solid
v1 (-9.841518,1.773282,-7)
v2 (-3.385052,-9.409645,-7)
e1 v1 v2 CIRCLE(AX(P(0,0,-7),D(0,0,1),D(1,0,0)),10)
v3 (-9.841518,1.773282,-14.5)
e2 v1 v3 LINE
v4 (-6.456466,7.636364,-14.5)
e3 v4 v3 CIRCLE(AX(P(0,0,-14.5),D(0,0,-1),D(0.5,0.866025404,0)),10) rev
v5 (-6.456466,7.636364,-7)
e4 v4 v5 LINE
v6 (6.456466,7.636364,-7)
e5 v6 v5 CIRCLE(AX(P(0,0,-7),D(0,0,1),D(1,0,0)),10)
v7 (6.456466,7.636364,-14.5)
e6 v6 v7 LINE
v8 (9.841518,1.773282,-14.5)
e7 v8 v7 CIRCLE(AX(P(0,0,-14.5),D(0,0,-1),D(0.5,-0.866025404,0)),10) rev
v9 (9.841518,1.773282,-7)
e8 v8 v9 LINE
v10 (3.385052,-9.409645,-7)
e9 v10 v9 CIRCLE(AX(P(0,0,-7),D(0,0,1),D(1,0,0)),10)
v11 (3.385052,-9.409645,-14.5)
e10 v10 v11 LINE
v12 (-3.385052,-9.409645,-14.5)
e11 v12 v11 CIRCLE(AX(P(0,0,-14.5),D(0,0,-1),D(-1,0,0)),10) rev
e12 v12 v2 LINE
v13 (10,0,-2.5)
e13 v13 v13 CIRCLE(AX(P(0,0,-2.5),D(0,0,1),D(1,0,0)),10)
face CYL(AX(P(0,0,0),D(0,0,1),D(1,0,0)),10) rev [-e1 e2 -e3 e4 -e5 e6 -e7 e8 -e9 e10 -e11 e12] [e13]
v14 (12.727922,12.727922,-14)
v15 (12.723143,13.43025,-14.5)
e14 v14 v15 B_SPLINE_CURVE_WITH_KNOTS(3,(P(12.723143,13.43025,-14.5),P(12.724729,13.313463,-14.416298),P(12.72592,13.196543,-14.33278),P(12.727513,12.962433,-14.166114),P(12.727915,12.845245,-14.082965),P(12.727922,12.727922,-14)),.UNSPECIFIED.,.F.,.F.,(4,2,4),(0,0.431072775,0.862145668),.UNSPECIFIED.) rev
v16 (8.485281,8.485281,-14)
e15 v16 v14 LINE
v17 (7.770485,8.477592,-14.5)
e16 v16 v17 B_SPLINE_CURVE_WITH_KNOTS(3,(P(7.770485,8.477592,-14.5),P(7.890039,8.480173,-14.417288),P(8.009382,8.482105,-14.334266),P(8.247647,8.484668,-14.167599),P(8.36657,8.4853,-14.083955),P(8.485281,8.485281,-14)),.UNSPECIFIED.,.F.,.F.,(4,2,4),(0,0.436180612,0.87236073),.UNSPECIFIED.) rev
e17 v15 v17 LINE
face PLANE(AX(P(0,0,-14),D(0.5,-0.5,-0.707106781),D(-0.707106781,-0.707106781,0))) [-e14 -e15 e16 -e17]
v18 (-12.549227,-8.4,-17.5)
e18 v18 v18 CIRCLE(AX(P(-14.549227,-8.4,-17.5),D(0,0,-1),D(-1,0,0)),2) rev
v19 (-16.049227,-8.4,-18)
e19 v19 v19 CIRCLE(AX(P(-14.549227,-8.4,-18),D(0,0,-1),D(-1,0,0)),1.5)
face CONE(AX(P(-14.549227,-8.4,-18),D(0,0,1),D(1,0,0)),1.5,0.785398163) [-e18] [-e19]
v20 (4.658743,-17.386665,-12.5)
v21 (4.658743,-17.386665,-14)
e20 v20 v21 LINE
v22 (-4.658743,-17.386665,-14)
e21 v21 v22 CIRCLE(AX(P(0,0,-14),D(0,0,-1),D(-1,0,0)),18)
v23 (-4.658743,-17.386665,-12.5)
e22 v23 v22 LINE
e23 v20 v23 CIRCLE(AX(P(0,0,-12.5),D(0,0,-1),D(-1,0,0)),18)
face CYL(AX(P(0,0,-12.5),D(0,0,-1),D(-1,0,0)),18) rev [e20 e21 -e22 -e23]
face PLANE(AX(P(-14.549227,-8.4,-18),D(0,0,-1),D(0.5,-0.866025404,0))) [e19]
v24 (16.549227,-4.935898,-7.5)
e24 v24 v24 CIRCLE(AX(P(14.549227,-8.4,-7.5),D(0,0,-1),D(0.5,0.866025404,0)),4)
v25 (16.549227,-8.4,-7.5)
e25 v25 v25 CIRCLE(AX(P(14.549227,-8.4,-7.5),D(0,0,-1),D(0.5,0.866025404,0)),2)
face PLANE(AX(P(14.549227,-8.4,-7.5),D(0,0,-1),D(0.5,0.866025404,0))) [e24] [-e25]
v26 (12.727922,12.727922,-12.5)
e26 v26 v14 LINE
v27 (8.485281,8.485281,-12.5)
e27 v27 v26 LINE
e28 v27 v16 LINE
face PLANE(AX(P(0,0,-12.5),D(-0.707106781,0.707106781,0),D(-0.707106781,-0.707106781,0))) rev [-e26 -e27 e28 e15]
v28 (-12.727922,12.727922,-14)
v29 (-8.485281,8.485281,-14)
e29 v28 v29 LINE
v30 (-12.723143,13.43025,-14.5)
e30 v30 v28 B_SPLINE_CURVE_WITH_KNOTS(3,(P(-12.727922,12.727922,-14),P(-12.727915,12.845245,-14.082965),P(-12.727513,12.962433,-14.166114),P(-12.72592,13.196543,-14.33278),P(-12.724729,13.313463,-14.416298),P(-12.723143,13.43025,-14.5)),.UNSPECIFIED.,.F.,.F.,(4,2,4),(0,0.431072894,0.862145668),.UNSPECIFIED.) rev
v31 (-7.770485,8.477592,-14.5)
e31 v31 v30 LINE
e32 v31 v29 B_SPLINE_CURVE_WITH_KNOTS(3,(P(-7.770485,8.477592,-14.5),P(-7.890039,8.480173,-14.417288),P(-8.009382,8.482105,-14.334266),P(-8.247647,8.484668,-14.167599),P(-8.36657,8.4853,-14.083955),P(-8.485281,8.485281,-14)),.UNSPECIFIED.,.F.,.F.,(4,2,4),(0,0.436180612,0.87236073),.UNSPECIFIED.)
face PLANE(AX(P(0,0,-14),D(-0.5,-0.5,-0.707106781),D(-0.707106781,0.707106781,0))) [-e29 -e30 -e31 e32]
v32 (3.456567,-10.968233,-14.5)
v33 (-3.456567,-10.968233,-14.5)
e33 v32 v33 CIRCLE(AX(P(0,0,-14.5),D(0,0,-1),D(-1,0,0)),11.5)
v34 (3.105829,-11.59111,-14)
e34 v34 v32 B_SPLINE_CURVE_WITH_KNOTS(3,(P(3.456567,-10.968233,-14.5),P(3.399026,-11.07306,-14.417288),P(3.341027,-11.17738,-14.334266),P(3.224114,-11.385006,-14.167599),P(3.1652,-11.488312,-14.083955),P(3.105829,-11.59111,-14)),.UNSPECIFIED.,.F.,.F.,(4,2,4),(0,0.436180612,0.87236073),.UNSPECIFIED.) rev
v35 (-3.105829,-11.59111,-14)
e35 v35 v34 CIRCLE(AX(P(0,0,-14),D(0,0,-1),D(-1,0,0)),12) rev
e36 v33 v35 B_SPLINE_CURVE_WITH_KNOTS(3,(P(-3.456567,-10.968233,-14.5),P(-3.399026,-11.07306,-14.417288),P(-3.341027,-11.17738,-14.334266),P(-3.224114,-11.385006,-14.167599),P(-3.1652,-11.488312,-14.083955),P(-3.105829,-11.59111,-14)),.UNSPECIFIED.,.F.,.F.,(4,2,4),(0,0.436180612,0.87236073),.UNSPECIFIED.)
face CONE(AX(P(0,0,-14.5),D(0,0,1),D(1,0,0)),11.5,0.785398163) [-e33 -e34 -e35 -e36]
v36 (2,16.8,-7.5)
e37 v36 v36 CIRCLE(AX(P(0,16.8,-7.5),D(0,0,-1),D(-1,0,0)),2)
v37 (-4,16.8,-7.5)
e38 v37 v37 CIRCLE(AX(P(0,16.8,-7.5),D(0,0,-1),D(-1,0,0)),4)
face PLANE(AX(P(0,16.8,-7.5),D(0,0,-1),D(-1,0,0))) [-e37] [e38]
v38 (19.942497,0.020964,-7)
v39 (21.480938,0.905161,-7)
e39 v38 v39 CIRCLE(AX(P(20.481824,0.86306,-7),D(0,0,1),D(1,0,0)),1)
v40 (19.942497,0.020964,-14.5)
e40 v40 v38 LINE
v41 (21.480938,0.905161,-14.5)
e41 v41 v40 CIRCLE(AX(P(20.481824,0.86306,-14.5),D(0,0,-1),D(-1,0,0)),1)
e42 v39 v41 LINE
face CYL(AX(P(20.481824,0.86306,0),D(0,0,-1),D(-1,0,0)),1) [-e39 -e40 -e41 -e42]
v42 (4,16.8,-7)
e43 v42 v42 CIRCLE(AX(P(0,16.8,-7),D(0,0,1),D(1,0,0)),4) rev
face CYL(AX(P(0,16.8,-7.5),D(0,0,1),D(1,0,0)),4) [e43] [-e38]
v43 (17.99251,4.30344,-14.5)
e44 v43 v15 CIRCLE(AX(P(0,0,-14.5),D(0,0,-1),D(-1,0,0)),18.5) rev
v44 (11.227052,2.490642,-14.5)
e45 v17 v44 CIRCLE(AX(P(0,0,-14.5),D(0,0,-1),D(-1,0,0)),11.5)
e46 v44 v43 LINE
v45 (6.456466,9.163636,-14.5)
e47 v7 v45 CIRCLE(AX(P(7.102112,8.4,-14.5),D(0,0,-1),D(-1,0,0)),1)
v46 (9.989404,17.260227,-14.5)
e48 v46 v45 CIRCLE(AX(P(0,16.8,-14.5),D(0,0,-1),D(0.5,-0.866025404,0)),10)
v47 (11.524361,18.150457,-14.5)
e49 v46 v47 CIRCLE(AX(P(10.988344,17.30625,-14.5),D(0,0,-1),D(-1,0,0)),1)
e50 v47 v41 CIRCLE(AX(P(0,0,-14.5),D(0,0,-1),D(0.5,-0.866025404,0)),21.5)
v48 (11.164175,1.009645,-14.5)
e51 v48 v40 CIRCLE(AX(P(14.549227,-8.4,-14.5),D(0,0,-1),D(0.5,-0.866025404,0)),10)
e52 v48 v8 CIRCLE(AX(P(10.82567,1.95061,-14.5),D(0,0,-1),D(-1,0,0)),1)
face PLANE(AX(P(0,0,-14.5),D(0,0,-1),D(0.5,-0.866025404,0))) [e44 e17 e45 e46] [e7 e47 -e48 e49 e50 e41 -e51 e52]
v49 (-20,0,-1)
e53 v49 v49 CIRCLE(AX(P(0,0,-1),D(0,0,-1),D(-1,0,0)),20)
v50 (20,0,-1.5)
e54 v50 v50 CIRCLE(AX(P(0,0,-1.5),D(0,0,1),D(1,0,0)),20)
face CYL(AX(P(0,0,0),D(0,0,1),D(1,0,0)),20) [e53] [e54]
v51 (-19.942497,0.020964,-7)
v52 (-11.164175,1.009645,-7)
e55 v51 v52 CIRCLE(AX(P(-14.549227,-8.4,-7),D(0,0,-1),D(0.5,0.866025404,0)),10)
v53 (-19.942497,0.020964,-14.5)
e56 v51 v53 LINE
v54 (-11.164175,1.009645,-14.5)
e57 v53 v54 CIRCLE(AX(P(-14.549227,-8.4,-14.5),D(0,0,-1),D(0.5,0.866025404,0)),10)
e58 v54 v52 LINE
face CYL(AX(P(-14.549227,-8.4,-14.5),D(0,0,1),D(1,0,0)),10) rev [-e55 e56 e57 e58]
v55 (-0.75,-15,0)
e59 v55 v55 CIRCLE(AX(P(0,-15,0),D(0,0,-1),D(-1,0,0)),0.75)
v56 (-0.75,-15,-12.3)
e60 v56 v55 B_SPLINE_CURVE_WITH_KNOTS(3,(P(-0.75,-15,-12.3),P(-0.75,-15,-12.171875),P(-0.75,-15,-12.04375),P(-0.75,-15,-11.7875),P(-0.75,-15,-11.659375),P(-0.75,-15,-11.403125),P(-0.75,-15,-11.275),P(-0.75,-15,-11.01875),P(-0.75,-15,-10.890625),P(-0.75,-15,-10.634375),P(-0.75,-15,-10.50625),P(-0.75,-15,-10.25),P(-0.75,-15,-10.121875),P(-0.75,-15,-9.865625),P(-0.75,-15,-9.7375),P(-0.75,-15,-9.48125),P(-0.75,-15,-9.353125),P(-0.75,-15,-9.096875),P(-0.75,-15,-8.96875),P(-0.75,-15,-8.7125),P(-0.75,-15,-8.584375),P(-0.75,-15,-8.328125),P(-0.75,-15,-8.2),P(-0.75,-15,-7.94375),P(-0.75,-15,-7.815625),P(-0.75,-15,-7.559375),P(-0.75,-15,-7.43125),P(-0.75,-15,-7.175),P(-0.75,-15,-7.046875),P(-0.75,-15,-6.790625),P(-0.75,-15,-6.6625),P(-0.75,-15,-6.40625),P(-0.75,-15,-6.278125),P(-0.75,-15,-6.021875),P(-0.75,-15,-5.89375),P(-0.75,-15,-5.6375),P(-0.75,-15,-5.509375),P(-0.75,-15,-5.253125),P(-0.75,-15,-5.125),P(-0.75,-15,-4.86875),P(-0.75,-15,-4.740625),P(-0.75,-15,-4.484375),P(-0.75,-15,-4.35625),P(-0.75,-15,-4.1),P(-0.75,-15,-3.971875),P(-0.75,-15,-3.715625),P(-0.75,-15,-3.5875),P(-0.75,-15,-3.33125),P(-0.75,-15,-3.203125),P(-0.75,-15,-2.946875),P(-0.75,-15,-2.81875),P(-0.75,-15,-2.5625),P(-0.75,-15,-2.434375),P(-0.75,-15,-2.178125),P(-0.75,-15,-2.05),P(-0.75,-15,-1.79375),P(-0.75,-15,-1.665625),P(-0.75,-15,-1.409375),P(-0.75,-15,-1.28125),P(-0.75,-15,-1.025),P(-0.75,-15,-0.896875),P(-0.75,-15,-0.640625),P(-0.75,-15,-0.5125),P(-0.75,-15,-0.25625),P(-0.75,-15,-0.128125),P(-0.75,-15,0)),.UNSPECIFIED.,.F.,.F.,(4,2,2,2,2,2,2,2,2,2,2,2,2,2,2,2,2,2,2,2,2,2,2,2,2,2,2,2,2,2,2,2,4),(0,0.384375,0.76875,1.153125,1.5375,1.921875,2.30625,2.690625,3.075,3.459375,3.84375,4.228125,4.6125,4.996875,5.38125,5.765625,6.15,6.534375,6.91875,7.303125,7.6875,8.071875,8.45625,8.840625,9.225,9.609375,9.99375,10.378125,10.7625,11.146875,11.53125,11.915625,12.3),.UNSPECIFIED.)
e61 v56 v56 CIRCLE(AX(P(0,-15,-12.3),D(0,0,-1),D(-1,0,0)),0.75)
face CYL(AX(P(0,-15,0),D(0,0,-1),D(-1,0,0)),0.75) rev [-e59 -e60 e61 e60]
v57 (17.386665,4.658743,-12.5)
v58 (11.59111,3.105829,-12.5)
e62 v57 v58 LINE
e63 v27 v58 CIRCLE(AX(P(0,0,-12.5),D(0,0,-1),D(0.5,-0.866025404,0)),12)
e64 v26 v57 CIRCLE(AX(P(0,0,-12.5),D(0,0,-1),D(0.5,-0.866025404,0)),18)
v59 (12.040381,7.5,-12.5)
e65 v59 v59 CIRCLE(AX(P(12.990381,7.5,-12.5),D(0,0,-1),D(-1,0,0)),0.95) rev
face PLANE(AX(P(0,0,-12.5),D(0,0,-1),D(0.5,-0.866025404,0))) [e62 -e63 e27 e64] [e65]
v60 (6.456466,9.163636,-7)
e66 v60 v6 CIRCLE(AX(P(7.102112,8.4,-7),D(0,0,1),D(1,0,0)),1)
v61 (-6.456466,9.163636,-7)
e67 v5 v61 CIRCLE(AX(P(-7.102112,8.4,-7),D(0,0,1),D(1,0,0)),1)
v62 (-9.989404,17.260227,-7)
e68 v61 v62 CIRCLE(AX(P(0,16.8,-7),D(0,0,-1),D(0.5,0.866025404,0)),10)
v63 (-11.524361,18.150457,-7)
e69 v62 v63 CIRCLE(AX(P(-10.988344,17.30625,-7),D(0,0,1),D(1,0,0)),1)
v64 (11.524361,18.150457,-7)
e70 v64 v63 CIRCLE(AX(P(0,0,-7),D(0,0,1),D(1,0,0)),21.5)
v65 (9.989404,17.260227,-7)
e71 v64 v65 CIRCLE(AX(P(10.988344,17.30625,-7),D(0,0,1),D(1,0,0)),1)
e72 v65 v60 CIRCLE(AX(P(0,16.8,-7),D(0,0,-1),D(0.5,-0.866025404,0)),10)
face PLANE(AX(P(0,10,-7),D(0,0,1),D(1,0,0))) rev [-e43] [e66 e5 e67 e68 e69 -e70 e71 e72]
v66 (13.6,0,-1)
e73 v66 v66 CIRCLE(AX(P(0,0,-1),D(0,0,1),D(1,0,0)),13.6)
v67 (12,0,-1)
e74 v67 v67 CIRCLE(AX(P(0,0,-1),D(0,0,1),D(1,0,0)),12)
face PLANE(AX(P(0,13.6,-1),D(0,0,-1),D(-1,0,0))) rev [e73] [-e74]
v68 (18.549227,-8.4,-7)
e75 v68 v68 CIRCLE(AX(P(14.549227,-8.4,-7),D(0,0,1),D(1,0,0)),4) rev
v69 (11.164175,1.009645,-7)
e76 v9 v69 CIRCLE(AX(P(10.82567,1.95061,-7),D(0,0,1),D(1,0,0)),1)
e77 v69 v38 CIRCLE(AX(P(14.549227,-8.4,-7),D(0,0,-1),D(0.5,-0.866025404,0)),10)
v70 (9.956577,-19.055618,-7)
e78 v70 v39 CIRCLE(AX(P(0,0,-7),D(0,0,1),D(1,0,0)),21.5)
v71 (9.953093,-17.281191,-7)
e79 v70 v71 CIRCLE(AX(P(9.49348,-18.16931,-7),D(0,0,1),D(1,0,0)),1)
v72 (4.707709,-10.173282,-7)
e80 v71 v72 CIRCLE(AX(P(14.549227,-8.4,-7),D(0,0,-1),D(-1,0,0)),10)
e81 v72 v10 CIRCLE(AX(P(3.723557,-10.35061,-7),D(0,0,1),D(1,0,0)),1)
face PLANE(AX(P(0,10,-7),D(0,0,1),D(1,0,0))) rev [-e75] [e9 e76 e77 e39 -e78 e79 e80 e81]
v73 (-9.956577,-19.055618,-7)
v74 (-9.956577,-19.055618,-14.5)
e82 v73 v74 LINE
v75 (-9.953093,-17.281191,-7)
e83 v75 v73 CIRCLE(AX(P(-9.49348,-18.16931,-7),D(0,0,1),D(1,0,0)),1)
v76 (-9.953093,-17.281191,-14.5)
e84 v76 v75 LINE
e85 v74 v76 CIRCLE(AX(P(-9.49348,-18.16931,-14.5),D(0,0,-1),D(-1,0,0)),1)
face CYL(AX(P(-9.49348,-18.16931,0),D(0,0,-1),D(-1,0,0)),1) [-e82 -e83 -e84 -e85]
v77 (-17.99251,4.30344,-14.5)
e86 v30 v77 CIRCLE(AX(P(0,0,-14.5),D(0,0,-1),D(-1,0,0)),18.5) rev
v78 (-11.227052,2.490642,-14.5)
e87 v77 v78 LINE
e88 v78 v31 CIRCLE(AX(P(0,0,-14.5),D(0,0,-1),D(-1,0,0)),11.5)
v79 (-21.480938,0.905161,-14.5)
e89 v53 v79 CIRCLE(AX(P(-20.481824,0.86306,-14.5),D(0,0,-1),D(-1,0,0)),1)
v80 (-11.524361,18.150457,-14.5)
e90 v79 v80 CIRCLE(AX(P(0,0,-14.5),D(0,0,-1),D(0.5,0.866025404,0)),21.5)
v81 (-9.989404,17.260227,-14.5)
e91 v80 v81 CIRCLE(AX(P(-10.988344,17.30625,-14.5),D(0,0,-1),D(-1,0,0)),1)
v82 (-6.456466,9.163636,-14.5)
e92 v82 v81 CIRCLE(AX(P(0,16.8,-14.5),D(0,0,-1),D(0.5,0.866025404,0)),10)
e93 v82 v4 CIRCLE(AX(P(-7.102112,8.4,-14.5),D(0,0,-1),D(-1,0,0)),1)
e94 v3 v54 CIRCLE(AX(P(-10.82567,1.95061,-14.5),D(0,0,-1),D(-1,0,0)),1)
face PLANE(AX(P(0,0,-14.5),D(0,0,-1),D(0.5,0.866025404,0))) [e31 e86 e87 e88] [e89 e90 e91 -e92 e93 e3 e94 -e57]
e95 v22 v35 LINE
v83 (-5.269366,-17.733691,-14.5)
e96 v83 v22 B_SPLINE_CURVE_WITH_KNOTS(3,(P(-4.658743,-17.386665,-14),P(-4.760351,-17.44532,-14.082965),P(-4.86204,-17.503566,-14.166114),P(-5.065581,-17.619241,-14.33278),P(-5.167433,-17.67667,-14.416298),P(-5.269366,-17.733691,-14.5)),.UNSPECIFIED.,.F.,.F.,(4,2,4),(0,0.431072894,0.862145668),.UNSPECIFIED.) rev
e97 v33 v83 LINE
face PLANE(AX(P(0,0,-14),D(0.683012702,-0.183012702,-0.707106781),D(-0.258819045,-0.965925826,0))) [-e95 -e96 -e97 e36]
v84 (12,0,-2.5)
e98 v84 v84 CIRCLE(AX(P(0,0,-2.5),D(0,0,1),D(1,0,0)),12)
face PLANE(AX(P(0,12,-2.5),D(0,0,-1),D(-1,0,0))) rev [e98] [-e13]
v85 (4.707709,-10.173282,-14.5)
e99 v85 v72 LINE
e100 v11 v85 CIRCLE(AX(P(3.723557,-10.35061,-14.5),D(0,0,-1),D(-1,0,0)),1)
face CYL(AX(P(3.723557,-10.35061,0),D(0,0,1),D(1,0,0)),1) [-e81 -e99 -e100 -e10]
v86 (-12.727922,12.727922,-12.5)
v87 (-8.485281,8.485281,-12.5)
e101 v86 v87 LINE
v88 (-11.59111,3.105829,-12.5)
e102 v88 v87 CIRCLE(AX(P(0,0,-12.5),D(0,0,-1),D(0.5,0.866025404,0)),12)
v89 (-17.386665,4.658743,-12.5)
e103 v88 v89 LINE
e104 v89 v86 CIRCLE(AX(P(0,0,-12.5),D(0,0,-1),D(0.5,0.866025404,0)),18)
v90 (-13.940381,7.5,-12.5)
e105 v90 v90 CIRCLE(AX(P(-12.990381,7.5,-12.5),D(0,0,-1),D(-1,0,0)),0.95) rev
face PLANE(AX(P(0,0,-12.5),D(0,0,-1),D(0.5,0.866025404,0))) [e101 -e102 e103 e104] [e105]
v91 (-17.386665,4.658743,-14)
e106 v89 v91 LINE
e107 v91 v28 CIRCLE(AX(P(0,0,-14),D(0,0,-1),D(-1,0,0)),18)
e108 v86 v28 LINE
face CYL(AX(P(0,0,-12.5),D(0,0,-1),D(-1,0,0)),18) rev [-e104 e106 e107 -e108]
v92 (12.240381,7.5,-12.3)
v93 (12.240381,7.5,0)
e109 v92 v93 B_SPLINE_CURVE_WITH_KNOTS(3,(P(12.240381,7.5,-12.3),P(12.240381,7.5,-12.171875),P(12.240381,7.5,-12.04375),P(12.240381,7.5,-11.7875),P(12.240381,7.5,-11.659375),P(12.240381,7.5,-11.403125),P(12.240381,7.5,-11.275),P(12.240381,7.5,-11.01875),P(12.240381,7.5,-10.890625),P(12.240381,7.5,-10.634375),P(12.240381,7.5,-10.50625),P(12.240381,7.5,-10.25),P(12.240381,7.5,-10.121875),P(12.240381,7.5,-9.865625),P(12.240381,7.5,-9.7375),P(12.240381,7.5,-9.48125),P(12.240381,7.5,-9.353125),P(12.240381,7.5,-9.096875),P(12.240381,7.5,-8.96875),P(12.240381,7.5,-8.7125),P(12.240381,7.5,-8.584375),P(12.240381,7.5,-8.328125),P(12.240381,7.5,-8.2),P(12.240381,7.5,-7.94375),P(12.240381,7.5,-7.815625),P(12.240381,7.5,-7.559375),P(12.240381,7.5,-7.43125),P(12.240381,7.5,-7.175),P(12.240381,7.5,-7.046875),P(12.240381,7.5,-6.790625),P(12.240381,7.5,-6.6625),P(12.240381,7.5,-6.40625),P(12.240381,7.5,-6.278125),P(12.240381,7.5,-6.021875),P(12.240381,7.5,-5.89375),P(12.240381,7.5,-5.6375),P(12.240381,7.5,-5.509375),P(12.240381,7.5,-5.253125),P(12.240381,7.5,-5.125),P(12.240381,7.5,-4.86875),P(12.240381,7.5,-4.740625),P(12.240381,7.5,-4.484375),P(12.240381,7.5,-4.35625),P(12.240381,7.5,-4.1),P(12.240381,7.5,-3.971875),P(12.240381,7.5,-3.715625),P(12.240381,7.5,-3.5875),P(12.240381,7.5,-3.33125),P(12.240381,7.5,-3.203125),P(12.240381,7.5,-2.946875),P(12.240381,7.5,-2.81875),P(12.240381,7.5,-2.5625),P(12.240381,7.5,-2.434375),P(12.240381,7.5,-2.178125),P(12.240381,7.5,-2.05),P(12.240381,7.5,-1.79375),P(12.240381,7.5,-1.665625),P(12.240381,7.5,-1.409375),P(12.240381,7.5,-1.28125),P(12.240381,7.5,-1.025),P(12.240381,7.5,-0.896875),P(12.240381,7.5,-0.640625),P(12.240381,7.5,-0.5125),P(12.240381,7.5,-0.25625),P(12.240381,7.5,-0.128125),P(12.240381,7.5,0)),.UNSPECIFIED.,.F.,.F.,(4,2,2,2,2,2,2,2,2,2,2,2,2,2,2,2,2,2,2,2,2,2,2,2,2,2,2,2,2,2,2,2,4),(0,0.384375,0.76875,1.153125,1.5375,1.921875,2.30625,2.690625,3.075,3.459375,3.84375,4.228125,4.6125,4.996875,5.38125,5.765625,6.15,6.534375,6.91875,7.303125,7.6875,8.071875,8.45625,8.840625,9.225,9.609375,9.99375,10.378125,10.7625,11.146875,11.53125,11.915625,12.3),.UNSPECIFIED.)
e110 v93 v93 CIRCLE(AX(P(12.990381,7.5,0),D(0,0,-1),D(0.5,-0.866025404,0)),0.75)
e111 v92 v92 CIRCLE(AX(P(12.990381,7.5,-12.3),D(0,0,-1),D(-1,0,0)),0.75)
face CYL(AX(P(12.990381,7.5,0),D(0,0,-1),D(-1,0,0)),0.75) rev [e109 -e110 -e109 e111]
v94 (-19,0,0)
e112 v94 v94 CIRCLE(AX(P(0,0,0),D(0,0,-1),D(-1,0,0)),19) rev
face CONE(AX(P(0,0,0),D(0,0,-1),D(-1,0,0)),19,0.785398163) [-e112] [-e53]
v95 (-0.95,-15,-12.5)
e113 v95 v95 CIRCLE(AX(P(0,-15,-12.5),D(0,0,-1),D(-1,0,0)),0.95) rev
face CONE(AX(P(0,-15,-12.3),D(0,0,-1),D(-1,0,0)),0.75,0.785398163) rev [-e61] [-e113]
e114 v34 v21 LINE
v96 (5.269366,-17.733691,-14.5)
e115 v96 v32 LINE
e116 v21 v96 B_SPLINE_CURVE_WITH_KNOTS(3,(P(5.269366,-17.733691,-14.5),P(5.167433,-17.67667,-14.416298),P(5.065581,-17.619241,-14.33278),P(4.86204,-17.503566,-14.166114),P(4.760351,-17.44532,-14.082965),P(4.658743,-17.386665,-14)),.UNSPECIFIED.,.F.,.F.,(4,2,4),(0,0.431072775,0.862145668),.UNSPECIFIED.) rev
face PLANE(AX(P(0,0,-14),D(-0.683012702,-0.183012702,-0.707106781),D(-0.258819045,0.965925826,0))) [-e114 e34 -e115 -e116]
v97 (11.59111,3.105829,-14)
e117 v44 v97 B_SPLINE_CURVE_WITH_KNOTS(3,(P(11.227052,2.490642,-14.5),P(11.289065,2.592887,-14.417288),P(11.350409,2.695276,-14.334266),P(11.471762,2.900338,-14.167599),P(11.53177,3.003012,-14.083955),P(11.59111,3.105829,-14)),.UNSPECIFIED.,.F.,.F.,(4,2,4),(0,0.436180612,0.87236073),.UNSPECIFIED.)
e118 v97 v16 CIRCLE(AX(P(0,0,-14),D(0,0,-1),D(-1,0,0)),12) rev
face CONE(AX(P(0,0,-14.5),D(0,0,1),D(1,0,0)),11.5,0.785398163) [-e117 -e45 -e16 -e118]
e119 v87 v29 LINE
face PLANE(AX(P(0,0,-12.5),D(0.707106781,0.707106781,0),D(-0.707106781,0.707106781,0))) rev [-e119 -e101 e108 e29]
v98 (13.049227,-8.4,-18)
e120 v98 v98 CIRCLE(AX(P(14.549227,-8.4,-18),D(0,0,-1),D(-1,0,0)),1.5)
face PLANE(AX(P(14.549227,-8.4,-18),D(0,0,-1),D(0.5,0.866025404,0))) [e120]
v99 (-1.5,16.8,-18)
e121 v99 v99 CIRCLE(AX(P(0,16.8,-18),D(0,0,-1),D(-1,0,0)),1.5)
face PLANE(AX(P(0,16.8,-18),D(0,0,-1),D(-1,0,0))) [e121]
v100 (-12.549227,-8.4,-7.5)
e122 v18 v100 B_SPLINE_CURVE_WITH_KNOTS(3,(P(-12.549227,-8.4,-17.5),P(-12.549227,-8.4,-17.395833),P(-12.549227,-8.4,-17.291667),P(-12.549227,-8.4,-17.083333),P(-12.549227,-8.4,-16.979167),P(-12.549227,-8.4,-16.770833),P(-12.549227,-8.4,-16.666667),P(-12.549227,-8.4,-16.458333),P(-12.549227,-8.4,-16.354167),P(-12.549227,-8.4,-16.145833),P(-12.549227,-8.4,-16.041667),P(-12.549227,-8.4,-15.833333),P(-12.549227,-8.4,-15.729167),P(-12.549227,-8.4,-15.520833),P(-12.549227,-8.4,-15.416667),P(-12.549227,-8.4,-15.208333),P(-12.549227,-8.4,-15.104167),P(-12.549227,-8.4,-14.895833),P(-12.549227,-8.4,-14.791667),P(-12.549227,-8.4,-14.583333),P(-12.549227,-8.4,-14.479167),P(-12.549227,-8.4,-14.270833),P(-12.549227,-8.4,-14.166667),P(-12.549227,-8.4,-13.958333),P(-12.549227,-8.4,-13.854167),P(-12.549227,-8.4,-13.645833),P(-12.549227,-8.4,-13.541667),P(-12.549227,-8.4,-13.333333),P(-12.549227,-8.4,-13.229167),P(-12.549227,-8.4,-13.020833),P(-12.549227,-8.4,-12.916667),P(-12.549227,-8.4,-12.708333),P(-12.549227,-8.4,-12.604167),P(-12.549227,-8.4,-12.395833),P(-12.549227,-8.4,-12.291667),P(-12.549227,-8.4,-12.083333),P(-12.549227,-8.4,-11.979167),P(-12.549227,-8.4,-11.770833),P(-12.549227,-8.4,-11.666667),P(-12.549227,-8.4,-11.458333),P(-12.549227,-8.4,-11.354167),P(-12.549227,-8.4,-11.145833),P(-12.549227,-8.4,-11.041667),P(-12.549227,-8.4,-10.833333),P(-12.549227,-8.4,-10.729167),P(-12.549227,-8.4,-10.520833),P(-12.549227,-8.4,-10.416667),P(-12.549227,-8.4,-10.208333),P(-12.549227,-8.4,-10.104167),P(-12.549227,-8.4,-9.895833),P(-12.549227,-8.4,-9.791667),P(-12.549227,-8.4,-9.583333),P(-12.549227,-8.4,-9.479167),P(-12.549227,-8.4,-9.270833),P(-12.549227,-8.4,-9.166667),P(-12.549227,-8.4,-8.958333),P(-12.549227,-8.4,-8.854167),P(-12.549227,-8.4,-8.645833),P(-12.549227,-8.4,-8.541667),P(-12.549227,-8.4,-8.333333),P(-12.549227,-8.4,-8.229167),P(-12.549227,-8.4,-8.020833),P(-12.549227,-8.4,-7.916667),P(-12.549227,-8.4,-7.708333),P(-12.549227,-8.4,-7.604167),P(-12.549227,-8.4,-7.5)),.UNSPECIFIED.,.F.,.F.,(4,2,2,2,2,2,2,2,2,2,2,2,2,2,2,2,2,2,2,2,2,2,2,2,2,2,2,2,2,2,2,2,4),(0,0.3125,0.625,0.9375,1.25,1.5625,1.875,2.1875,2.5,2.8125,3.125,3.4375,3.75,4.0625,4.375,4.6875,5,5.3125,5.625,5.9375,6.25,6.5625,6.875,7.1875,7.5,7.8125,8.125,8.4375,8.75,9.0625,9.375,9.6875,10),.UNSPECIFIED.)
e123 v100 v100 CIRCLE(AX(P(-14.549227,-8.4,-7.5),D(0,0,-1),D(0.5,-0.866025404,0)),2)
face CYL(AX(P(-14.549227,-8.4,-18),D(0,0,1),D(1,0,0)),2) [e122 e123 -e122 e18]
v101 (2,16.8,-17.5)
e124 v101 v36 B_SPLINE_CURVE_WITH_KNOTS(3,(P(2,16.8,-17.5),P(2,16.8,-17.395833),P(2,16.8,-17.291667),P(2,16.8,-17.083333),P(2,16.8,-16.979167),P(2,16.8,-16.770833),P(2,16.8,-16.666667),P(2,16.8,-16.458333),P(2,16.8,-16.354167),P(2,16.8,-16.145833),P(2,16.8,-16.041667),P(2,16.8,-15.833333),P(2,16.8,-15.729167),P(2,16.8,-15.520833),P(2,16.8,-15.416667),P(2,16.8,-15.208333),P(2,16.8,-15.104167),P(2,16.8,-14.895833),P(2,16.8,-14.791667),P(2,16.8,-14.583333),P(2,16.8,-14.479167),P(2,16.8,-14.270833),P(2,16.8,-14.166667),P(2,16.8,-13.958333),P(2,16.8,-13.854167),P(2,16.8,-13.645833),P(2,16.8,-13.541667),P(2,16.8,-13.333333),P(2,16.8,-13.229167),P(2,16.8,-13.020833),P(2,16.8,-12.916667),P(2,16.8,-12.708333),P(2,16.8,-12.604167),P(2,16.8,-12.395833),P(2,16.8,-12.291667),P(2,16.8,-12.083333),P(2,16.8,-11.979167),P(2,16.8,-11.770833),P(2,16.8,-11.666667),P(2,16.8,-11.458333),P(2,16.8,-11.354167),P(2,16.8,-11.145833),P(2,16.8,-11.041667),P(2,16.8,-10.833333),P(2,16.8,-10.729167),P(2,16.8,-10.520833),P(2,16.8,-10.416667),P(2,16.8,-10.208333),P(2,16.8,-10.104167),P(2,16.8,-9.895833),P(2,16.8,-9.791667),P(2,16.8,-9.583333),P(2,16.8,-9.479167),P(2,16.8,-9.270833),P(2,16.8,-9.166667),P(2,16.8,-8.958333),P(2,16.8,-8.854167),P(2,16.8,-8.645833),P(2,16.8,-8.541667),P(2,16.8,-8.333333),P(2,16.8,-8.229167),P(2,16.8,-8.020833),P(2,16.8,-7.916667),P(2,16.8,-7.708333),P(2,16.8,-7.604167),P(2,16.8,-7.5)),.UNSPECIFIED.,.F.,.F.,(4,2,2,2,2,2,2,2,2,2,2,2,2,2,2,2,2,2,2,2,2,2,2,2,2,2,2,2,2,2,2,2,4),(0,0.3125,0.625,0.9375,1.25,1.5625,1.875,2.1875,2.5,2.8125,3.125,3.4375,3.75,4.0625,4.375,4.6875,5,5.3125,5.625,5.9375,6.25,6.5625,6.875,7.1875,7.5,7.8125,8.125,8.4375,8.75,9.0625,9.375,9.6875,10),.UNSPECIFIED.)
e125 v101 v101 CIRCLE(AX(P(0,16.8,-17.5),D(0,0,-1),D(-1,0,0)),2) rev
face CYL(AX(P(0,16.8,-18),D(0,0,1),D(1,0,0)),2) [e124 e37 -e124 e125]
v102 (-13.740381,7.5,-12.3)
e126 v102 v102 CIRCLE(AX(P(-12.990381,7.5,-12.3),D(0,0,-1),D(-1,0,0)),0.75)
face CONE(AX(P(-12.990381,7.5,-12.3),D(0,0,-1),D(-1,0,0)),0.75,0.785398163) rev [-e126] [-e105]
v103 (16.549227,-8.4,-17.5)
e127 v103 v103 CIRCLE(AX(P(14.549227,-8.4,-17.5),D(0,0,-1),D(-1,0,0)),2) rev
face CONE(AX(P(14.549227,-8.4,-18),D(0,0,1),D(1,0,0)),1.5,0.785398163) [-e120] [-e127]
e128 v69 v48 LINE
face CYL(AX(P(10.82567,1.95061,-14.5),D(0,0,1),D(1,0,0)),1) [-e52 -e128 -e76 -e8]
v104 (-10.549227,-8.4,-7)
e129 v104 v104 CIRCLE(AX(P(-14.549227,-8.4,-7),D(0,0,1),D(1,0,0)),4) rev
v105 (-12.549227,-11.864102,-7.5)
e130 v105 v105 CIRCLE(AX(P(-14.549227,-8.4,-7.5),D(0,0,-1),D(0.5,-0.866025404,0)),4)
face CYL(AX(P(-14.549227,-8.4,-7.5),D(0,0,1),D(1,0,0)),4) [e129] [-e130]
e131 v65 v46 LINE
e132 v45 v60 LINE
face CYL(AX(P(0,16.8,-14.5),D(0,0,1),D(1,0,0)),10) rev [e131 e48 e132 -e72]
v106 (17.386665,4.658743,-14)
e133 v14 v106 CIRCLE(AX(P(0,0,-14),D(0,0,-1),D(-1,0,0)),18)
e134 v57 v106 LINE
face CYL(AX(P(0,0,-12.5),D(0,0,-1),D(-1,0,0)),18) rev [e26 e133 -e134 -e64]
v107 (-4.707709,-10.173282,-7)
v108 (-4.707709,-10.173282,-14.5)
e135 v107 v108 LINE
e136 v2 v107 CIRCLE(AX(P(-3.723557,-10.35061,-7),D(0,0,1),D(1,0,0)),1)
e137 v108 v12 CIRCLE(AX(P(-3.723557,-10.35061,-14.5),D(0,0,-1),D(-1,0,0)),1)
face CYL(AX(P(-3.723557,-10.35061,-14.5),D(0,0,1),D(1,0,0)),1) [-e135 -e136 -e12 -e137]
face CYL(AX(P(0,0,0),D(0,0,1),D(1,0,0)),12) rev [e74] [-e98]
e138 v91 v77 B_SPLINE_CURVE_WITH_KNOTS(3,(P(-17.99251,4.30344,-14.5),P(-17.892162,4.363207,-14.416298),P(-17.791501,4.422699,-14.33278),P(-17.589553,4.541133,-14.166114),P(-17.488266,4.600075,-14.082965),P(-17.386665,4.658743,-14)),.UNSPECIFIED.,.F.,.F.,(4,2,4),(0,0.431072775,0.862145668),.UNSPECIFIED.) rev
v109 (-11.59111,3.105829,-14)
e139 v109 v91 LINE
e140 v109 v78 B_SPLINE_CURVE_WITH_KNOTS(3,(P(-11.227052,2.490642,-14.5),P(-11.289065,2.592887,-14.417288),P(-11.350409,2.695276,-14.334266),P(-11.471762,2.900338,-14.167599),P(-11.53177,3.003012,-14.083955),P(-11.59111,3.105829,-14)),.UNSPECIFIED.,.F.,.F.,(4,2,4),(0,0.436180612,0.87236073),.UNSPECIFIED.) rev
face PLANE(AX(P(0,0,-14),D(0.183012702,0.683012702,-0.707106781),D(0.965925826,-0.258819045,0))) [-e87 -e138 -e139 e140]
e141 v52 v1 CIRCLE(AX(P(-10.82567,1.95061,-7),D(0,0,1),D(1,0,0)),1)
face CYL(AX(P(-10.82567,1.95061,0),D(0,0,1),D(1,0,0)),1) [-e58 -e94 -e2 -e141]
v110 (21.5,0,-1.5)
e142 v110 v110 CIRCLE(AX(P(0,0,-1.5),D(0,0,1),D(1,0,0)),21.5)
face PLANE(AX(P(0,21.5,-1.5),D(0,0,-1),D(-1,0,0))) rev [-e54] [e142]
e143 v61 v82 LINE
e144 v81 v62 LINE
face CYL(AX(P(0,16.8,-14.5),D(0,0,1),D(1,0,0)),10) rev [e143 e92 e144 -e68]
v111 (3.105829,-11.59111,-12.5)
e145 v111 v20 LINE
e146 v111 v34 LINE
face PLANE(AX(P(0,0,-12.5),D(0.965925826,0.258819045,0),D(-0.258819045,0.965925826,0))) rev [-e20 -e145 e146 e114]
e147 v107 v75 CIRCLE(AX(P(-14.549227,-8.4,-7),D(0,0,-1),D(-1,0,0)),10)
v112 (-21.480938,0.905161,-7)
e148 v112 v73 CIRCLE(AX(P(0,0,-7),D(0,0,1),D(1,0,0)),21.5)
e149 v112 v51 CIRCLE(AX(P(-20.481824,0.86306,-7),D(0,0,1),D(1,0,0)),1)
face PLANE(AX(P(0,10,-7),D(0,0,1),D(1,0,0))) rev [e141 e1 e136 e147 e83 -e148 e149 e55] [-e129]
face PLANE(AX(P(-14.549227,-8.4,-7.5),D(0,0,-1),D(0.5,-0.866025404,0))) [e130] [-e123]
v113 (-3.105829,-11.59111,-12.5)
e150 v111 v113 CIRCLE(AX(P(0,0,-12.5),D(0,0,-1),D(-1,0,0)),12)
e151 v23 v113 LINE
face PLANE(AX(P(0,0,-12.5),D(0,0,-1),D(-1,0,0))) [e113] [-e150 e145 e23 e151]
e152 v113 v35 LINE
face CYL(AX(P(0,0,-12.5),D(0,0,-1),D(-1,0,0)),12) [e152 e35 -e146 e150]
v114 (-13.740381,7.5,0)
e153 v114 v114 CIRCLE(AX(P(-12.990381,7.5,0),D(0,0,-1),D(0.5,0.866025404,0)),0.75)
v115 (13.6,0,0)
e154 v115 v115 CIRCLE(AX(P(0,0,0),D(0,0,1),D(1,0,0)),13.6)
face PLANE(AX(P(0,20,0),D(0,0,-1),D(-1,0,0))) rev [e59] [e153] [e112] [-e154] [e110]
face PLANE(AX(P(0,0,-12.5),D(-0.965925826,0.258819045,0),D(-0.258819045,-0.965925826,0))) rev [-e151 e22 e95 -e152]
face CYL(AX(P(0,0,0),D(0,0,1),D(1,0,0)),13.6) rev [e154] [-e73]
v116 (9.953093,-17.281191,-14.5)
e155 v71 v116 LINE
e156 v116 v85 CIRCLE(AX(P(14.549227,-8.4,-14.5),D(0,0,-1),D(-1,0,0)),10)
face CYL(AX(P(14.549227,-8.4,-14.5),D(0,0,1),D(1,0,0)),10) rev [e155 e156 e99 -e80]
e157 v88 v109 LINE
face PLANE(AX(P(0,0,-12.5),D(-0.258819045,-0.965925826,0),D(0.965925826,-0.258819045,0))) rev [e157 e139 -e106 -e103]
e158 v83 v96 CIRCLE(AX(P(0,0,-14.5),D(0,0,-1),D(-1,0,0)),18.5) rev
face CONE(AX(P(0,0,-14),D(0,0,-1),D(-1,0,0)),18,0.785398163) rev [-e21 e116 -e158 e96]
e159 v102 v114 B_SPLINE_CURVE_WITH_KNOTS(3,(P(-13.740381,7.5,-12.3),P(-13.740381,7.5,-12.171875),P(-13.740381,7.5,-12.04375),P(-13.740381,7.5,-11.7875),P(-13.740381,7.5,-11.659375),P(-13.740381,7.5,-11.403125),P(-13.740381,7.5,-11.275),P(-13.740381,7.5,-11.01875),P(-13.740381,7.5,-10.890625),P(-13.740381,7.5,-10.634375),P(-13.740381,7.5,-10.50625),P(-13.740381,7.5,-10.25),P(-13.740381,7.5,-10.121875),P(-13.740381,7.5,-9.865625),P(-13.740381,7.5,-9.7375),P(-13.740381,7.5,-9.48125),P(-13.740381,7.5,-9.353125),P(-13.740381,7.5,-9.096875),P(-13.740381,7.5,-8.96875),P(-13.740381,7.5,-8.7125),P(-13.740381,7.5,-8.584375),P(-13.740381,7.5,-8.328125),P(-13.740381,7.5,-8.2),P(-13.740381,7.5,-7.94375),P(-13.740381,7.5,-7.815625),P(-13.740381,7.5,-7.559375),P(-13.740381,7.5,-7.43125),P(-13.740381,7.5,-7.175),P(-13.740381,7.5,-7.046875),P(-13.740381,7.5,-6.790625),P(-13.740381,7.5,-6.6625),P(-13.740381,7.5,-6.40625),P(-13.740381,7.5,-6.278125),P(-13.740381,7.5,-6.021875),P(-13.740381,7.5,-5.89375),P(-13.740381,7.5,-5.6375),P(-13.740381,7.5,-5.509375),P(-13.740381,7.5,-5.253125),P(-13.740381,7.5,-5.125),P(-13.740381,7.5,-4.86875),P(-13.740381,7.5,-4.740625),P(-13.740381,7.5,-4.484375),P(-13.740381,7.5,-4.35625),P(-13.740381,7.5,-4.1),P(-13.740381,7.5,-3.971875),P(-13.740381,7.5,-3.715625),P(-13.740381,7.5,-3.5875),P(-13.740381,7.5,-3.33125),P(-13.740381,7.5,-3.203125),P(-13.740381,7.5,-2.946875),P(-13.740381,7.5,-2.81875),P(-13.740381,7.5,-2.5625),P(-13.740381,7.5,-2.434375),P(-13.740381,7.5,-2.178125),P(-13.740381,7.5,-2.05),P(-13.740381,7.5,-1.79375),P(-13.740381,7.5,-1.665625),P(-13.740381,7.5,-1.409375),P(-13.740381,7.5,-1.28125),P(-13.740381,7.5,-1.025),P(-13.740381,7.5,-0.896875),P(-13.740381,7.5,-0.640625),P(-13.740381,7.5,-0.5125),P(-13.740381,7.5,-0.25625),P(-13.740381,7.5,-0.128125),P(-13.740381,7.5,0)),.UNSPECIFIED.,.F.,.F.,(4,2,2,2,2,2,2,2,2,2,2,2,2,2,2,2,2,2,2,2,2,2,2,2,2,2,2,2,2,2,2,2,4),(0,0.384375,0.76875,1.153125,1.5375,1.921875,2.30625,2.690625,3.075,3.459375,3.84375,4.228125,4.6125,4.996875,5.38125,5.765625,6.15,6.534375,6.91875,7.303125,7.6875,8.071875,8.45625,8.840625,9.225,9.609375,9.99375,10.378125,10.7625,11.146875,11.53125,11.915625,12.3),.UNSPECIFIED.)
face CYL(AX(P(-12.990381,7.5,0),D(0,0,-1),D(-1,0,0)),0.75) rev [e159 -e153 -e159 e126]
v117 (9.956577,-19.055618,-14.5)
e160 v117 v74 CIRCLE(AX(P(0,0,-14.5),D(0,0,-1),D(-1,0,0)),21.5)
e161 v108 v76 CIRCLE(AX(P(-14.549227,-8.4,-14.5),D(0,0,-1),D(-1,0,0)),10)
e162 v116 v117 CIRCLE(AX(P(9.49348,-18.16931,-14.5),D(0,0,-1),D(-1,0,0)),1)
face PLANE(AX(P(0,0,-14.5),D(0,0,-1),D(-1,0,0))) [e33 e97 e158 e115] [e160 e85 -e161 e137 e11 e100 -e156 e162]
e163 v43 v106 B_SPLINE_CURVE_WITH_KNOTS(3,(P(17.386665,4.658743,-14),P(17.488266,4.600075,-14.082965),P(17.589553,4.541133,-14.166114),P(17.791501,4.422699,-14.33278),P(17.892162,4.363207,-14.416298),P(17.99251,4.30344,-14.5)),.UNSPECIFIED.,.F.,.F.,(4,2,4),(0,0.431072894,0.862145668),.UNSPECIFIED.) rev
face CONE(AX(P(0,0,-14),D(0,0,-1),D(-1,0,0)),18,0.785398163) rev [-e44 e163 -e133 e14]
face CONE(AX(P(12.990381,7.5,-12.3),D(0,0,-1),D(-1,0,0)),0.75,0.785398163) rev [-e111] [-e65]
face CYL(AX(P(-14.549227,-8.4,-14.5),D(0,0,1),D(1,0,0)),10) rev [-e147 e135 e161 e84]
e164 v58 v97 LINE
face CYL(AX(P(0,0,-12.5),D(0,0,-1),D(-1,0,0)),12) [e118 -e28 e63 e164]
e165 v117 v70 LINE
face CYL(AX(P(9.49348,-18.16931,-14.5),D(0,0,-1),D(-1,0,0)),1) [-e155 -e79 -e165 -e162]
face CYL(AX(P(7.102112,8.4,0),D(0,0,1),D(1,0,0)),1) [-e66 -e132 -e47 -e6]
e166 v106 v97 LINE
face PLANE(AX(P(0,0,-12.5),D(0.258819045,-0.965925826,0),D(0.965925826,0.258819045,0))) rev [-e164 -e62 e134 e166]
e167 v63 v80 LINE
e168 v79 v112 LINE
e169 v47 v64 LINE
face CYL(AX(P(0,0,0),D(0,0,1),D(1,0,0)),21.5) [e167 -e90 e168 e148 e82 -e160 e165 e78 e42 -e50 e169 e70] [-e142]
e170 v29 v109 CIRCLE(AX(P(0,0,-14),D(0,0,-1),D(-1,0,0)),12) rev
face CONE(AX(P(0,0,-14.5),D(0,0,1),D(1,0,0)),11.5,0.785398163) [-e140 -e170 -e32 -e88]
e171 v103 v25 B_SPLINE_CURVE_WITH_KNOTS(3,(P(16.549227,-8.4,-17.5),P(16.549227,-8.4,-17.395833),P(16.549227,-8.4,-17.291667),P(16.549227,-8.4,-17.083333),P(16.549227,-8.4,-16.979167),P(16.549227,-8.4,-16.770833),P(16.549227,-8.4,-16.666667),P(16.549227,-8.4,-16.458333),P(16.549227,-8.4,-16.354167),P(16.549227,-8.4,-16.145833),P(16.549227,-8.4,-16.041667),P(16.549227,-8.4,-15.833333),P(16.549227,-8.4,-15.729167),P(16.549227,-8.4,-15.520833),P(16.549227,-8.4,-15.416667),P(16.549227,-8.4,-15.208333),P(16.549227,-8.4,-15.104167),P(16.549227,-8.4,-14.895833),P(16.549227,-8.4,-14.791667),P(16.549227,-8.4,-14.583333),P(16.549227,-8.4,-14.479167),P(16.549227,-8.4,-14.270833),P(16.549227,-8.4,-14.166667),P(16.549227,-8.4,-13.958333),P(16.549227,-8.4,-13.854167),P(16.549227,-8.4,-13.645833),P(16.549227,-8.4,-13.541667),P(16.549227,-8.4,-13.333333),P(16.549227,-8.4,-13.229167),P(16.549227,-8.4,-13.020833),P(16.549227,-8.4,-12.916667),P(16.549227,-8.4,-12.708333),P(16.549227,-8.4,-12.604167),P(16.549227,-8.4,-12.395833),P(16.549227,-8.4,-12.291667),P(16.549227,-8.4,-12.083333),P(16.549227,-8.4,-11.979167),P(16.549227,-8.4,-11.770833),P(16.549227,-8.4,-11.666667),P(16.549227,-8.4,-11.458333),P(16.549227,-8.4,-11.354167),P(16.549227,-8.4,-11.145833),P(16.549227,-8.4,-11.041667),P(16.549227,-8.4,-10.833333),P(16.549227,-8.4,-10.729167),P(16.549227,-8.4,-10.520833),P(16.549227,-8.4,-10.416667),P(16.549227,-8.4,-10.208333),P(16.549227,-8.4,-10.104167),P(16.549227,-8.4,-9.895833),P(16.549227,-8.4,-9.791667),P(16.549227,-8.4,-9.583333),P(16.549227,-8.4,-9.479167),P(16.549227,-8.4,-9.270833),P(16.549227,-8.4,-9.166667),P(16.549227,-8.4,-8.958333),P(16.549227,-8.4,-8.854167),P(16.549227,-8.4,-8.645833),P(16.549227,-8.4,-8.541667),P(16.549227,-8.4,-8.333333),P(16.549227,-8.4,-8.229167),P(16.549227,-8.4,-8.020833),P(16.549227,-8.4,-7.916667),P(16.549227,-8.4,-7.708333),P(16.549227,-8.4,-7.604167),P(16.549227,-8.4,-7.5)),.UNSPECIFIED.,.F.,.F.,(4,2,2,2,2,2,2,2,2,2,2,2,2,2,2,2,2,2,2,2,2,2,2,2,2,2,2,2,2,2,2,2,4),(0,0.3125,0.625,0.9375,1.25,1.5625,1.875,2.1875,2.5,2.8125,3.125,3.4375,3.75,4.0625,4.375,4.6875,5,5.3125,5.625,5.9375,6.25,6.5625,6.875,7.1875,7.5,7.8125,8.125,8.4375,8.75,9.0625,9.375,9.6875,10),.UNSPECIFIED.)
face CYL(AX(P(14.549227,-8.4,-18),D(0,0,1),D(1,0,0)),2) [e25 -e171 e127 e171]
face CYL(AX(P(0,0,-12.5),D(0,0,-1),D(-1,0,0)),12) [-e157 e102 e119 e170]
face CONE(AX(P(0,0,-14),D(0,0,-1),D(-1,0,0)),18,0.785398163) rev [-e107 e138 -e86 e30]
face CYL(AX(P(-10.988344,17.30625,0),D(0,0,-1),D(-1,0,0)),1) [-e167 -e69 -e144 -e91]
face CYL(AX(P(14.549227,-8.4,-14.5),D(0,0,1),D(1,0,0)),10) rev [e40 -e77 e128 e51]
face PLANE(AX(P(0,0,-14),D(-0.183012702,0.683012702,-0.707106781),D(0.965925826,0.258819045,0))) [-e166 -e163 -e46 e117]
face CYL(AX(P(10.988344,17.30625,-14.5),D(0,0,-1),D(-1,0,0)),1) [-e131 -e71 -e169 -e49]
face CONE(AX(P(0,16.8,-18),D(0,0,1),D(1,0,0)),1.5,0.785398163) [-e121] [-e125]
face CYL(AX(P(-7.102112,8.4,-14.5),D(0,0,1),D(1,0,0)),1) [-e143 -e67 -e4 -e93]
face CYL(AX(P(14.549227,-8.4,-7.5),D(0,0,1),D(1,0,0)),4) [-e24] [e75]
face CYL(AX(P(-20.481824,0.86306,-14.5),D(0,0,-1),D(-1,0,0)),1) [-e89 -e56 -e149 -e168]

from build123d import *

# Parameters (mm, degrees)
SKETCH4_R                    = 4
BOSS_EXTRUDE1_DEPTH          = 0.5
SKETCH5_R                    = 2
BOSS_EXTRUDE2_DEPTH          = 10.5
CHAMFER1_SIZE                = 0.5
CIRPATTERN1_COUNT            = 3
CHAMFER1_OF_CIRPATTERN1_SIZE = 0.5
BOSS_EXTRUDE3_DEPTH          = 7.5
SKETCH7_R                    = 0.75
CUT_EXTRUDE1_DEPTH           = 2
CUT_EXTRUDE2_DEPTH           = 34.686050525
CHAMFER2_SIZE                = 0.2
CHAMFER3_SIZE                = 0.5
CIRPATTERN2_COUNT            = 3
CHAMFER2_OF_CIRPATTERN2_SIZE = 0.2
CHAMFER3_OF_CIRPATTERN2_SIZE = 0.5
CHAMFER4_SIZE                = 1
FILLET1_R                    = 1


with BuildPart() as part:
    # Sketch3 → Revolve1 (revolve)
    with BuildSketch(Plane(origin=(0, 0, 0), x_dir=(0, 0, -1), z_dir=(1, 0, 0)), mode=Mode.PRIVATE) as revolve1_sk:
        Polygon((1, 13.6), (1, 12), (2.5, 12), (2.5, 10), (7, 10), (7, 21.5), (1.5, 21.5), (1.5, 20), (0, 20), (0, 13.6), align=None)
    revolve(revolve1_sk.sketch.rotate(Axis((0, 0, 0), (0, 0, -1)), 90), axis=Axis((0, 0, 0), (0, 0, -1)))

    # Sketch4 → Boss-Extrude1 (add)
    with BuildSketch(Plane(origin=(0, 0, -7), x_dir=(-1, 0, 0), z_dir=(0, 0, -1))):
        with Locations(Location((0, 16.8, 0), (0, 0, 180))):
            Circle(SKETCH4_R)
    boss_extrude1 = extrude(amount=BOSS_EXTRUDE1_DEPTH)

    # Sketch5 → Boss-Extrude2 (add)
    with BuildSketch(Plane(origin=(0, 0, -7.5), x_dir=(-1, 0, 0), z_dir=(0, 0, -1))):
        with Locations(Location((0, 16.8, 0), (0, 0, 180))):
            Circle(SKETCH5_R)
    boss_extrude2 = extrude(amount=BOSS_EXTRUDE2_DEPTH)

    # Chamfer1
    chamfer1_edges = [part.edges().sort_by_distance(p)[0] for p in [
        (-2, 16.8, -18),
    ]]
    chamfer(chamfer1_edges, length=CHAMFER1_SIZE)

    # CirPattern1: Boss-Extrude1, Boss-Extrude2 ×3 about axis
    cirpattern1_axis = Axis((0, 0, 0), (0, 0, 1))
    add([boss_extrude1.rotate(cirpattern1_axis, i * 360 / CIRPATTERN1_COUNT) for i in range(1, CIRPATTERN1_COUNT)])
    add([boss_extrude2.rotate(cirpattern1_axis, i * 360 / CIRPATTERN1_COUNT) for i in range(1, CIRPATTERN1_COUNT)])

    # Chamfer1 of CirPattern1
    chamfer1_of_cirpattern1_edges = [part.edges().sort_by_distance(p)[0] for p in [
        (-13.549226784, -10.132050808, -18),
        (15.549226784, -6.667949192, -18),
    ]]
    chamfer(chamfer1_of_cirpattern1_edges, length=CHAMFER1_OF_CIRPATTERN1_SIZE)

    # Sketch6 → Boss-Extrude3 (add)
    with BuildSketch(Plane(origin=(0, 0, -7), x_dir=(-1, 0, 0), z_dir=(0, 0, -1))):
        with BuildLine():
            ThreePointArc((-4.561681399, -8.89893605), (-6.703398823, -14.60024061), (-11.755277198, -18.001762636))
            ThreePointArc((-11.755277198, -18.001762636), (0, -21.5), (11.755277198, -18.001762636))
            ThreePointArc((11.755277198, -18.001762636), (6.703398823, -14.60024061), (4.561681399, -8.89893605))
            ThreePointArc((4.561681399, -8.89893605), (0, -10), (-4.561681399, -8.89893605))
        make_face()
    boss_extrude3 = extrude(amount=BOSS_EXTRUDE3_DEPTH)

    # Sketch7 → Cut-Extrude1 (cut)
    with BuildSketch(Plane(origin=(0, 0, -14.5), x_dir=(-1, 0, 0), z_dir=(0, 0, -1))):
        with BuildLine():
            Line((-3.105828541, -11.591109915), (-4.658742812, -17.386664873))
            ThreePointArc((-4.658742812, -17.386664873), (0, -18), (4.658742812, -17.386664873))
            Line((4.658742812, -17.386664873), (3.105828541, -11.591109915))
            ThreePointArc((3.105828541, -11.591109915), (0, -12), (-3.105828541, -11.591109915))
        make_face()
        with Locations((0, -15)):
            Circle(SKETCH7_R, mode=Mode.SUBTRACT)
    cut_extrude1 = extrude(amount=-CUT_EXTRUDE1_DEPTH, mode=Mode.SUBTRACT)

    # Sketch7<3> → Cut-Extrude2 (cut, through all)
    with BuildSketch(Plane(origin=(0, 0, -14.5), x_dir=(-1, 0, 0), z_dir=(0, 0, -1))):
        with BuildLine():
            ThreePointArc((0.75, -15), (0.530330086, -14.469669914), (0, -14.25))
            Line((0, -14.25), (0, -15.75))
            ThreePointArc((0, -15.75), (0.530330086, -15.530330086), (0.75, -15))
        make_face()
        with BuildLine():
            Line((0, -15.75), (0, -14.25))
            ThreePointArc((0, -14.25), (-0.75, -15), (0, -15.75))
        make_face()
    cut_extrude2 = extrude(amount=-CUT_EXTRUDE2_DEPTH, mode=Mode.SUBTRACT)

    # Chamfer2
    chamfer2_edges = [part.edges().sort_by_distance(p)[0] for p in [
        (0, -15.75, -12.5),
    ]]
    chamfer(chamfer2_edges, length=CHAMFER2_SIZE)

    # Chamfer3
    chamfer3_edges = [part.edges().sort_by_distance(p)[0] for p in [
        (0, -12, -14.5),
        (3.882285677, -14.488887394, -14.5),
        (0, -18, -14.5),
        (-3.882285677, -14.488887394, -14.5),
    ]]
    chamfer(chamfer3_edges, length=CHAMFER3_SIZE)

    # CirPattern2: Boss-Extrude3, Cut-Extrude1, Cut-Extrude2 ×3 about axis
    cirpattern2_axis = Axis((0, 0, 0), (0, 0, 1))
    add([boss_extrude3.rotate(cirpattern2_axis, i * 360 / CIRPATTERN2_COUNT) for i in range(1, CIRPATTERN2_COUNT)])
    add([cut_extrude1.rotate(cirpattern2_axis, i * 360 / CIRPATTERN2_COUNT) for i in range(1, CIRPATTERN2_COUNT)], mode=Mode.SUBTRACT)
    add([cut_extrude2.rotate(cirpattern2_axis, i * 360 / CIRPATTERN2_COUNT) for i in range(1, CIRPATTERN2_COUNT)], mode=Mode.SUBTRACT)

    # Chamfer2 of CirPattern2
    chamfer2_of_cirpattern2_edges = [part.edges().sort_by_distance(p)[0] for p in [
        (13.63990011, 7.875, -12.5),
        (-13.63990011, 7.875, -12.5),
    ]]
    chamfer(chamfer2_of_cirpattern2_edges, length=CHAMFER2_OF_CIRPATTERN2_SIZE)

    # Chamfer3 of CirPattern2
    chamfer3_of_cirpattern2_edges = [part.edges().sort_by_distance(p)[0] for p in [
        (10.392304845, 6, -14.5),
        (10.606601718, 10.606601718, -14.5),
        (15.588457268, 9, -14.5),
        (14.488887394, 3.882285677, -14.5),
        (-10.392304845, 6, -14.5),
        (-14.488887394, 3.882285677, -14.5),
        (-15.588457268, 9, -14.5),
        (-10.606601718, 10.606601718, -14.5),
    ]]
    chamfer(chamfer3_of_cirpattern2_edges, length=CHAMFER3_OF_CIRPATTERN2_SIZE)

    # Chamfer4
    chamfer4_edges = [part.edges().sort_by_distance(p)[0] for p in [
        (-20, 0, 0),
    ]]
    chamfer(chamfer4_edges, length=CHAMFER4_SIZE)

    # Fillet1
    # the kernel refuses this fillet: 1 mm, written as the material it takes off along each edge
    with BuildSketch(Plane(origin=(21.467622355, -1.179487364, -7), x_dir=(0.006387197521753035, 0.9999796016458627, 0), z_dir=(0, 0, -1)), Plane(origin=(-9.712345156, 19.18125, -7), x_dir=(-0.8692013370524373, -0.49445832551010344, 0), z_dir=(0, 0, -1)), Plane(origin=(-11.755277198, -18.001762636, -7), x_dir=(0.862814139530684, -0.5055212761357581, 0), z_dir=(0, 0, -1))) as fillet1_piece_1:
        with BuildLine():
            CenterArc((2.036209541, -0.998824096), FILLET1_R, 87.221143718, 125.050734124)
            ThreePointArc((1.190685537, -1.532761506), (0.632617432, -0.737424909), (0, 0))
            ThreePointArc((0, 0), (1.04234536, 0.025281931), (2.084690721, 0))
        make_face()
    extrude(amount=12.711726802, mode=Mode.SUBTRACT)
    with BuildSketch(Plane(origin=(9.987545385, 0.49893605, -7), x_dir=(0.9173175626436978, 0.3981563628342837, 0), z_dir=(0, 0, -1)), Plane(origin=(-5.425863987, 8.4, -7), x_dir=(-0.8034723062147525, 0.5953421311699238, 0), z_dir=(0, 0, -1)), Plane(origin=(-4.561681399, -8.89893605, -7), x_dir=(-0.113845256428944, -0.9934984940042073, 0), z_dir=(0, 0, -1))) as fillet1_piece_2:
        with BuildLine():
            CenterArc((1.346819148, -0.99794128), FILLET1_R, 93.677145319, 99.571657965)
            ThreePointArc((0.373435102, -1.22712134), (0.20641295, -0.607567006), (0, 0))
            ThreePointArc((0, 0), (0.641342451, -0.020587199), (1.282684903, 0))
        make_face()
    extrude(amount=10.706712257, mode=Mode.SUBTRACT)
    with BuildSketch(Plane(origin=(5.425863987, 8.4, -7), x_dir=(0.8034723062147457, 0.595342131169933, 0), z_dir=(0, 0, -1)), Plane(origin=(-9.987545385, 0.49893605, -7), x_dir=(-0.9173175626437021, 0.3981563628342733, 0), z_dir=(0, 0, -1)), Plane(origin=(4.561681399, -8.89893605, -7), x_dir=(0.11384525642895783, -0.9934984940042058, 0), z_dir=(0, 0, -1))) as fillet1_piece_3:
        with BuildLine():
            CenterArc((1.346819148, 0.99794128), FILLET1_R, 166.751196715, 99.571657965)
            ThreePointArc((0.373435102, 1.22712134), (0.20641295, 0.607567006), (0, 0))
            ThreePointArc((0, 0), (0.641342451, 0.020587199), (1.282684903, 0))
        make_face()
    extrude(amount=10.706712257, mode=Mode.SUBTRACT)
    with BuildSketch(Plane(origin=(9.712345156, 19.18125, -7), x_dir=(0.8692013370524435, -0.4944583255100922, 0), z_dir=(0, 0, -1)), Plane(origin=(-21.467622355, -1.179487364, -7), x_dir=(-0.006387197521766656, 0.9999796016458625, 0), z_dir=(0, 0, -1)), Plane(origin=(11.755277198, -18.001762636, -7), x_dir=(-0.8628141395306765, -0.5055212761357707, 0), z_dir=(0, 0, -1))) as fillet1_piece_4:
        with BuildLine():
            CenterArc((2.036209541, 0.998824096), FILLET1_R, 147.728122158, 125.050734124)
            ThreePointArc((1.190685537, 1.532761506), (0.632617432, 0.737424909), (0, 0))
            ThreePointArc((0, 0), (1.04234536, -0.025281931), (2.084690721, 0))
        make_face()
    extrude(amount=12.711726802, mode=Mode.SUBTRACT)


solid = part.part
